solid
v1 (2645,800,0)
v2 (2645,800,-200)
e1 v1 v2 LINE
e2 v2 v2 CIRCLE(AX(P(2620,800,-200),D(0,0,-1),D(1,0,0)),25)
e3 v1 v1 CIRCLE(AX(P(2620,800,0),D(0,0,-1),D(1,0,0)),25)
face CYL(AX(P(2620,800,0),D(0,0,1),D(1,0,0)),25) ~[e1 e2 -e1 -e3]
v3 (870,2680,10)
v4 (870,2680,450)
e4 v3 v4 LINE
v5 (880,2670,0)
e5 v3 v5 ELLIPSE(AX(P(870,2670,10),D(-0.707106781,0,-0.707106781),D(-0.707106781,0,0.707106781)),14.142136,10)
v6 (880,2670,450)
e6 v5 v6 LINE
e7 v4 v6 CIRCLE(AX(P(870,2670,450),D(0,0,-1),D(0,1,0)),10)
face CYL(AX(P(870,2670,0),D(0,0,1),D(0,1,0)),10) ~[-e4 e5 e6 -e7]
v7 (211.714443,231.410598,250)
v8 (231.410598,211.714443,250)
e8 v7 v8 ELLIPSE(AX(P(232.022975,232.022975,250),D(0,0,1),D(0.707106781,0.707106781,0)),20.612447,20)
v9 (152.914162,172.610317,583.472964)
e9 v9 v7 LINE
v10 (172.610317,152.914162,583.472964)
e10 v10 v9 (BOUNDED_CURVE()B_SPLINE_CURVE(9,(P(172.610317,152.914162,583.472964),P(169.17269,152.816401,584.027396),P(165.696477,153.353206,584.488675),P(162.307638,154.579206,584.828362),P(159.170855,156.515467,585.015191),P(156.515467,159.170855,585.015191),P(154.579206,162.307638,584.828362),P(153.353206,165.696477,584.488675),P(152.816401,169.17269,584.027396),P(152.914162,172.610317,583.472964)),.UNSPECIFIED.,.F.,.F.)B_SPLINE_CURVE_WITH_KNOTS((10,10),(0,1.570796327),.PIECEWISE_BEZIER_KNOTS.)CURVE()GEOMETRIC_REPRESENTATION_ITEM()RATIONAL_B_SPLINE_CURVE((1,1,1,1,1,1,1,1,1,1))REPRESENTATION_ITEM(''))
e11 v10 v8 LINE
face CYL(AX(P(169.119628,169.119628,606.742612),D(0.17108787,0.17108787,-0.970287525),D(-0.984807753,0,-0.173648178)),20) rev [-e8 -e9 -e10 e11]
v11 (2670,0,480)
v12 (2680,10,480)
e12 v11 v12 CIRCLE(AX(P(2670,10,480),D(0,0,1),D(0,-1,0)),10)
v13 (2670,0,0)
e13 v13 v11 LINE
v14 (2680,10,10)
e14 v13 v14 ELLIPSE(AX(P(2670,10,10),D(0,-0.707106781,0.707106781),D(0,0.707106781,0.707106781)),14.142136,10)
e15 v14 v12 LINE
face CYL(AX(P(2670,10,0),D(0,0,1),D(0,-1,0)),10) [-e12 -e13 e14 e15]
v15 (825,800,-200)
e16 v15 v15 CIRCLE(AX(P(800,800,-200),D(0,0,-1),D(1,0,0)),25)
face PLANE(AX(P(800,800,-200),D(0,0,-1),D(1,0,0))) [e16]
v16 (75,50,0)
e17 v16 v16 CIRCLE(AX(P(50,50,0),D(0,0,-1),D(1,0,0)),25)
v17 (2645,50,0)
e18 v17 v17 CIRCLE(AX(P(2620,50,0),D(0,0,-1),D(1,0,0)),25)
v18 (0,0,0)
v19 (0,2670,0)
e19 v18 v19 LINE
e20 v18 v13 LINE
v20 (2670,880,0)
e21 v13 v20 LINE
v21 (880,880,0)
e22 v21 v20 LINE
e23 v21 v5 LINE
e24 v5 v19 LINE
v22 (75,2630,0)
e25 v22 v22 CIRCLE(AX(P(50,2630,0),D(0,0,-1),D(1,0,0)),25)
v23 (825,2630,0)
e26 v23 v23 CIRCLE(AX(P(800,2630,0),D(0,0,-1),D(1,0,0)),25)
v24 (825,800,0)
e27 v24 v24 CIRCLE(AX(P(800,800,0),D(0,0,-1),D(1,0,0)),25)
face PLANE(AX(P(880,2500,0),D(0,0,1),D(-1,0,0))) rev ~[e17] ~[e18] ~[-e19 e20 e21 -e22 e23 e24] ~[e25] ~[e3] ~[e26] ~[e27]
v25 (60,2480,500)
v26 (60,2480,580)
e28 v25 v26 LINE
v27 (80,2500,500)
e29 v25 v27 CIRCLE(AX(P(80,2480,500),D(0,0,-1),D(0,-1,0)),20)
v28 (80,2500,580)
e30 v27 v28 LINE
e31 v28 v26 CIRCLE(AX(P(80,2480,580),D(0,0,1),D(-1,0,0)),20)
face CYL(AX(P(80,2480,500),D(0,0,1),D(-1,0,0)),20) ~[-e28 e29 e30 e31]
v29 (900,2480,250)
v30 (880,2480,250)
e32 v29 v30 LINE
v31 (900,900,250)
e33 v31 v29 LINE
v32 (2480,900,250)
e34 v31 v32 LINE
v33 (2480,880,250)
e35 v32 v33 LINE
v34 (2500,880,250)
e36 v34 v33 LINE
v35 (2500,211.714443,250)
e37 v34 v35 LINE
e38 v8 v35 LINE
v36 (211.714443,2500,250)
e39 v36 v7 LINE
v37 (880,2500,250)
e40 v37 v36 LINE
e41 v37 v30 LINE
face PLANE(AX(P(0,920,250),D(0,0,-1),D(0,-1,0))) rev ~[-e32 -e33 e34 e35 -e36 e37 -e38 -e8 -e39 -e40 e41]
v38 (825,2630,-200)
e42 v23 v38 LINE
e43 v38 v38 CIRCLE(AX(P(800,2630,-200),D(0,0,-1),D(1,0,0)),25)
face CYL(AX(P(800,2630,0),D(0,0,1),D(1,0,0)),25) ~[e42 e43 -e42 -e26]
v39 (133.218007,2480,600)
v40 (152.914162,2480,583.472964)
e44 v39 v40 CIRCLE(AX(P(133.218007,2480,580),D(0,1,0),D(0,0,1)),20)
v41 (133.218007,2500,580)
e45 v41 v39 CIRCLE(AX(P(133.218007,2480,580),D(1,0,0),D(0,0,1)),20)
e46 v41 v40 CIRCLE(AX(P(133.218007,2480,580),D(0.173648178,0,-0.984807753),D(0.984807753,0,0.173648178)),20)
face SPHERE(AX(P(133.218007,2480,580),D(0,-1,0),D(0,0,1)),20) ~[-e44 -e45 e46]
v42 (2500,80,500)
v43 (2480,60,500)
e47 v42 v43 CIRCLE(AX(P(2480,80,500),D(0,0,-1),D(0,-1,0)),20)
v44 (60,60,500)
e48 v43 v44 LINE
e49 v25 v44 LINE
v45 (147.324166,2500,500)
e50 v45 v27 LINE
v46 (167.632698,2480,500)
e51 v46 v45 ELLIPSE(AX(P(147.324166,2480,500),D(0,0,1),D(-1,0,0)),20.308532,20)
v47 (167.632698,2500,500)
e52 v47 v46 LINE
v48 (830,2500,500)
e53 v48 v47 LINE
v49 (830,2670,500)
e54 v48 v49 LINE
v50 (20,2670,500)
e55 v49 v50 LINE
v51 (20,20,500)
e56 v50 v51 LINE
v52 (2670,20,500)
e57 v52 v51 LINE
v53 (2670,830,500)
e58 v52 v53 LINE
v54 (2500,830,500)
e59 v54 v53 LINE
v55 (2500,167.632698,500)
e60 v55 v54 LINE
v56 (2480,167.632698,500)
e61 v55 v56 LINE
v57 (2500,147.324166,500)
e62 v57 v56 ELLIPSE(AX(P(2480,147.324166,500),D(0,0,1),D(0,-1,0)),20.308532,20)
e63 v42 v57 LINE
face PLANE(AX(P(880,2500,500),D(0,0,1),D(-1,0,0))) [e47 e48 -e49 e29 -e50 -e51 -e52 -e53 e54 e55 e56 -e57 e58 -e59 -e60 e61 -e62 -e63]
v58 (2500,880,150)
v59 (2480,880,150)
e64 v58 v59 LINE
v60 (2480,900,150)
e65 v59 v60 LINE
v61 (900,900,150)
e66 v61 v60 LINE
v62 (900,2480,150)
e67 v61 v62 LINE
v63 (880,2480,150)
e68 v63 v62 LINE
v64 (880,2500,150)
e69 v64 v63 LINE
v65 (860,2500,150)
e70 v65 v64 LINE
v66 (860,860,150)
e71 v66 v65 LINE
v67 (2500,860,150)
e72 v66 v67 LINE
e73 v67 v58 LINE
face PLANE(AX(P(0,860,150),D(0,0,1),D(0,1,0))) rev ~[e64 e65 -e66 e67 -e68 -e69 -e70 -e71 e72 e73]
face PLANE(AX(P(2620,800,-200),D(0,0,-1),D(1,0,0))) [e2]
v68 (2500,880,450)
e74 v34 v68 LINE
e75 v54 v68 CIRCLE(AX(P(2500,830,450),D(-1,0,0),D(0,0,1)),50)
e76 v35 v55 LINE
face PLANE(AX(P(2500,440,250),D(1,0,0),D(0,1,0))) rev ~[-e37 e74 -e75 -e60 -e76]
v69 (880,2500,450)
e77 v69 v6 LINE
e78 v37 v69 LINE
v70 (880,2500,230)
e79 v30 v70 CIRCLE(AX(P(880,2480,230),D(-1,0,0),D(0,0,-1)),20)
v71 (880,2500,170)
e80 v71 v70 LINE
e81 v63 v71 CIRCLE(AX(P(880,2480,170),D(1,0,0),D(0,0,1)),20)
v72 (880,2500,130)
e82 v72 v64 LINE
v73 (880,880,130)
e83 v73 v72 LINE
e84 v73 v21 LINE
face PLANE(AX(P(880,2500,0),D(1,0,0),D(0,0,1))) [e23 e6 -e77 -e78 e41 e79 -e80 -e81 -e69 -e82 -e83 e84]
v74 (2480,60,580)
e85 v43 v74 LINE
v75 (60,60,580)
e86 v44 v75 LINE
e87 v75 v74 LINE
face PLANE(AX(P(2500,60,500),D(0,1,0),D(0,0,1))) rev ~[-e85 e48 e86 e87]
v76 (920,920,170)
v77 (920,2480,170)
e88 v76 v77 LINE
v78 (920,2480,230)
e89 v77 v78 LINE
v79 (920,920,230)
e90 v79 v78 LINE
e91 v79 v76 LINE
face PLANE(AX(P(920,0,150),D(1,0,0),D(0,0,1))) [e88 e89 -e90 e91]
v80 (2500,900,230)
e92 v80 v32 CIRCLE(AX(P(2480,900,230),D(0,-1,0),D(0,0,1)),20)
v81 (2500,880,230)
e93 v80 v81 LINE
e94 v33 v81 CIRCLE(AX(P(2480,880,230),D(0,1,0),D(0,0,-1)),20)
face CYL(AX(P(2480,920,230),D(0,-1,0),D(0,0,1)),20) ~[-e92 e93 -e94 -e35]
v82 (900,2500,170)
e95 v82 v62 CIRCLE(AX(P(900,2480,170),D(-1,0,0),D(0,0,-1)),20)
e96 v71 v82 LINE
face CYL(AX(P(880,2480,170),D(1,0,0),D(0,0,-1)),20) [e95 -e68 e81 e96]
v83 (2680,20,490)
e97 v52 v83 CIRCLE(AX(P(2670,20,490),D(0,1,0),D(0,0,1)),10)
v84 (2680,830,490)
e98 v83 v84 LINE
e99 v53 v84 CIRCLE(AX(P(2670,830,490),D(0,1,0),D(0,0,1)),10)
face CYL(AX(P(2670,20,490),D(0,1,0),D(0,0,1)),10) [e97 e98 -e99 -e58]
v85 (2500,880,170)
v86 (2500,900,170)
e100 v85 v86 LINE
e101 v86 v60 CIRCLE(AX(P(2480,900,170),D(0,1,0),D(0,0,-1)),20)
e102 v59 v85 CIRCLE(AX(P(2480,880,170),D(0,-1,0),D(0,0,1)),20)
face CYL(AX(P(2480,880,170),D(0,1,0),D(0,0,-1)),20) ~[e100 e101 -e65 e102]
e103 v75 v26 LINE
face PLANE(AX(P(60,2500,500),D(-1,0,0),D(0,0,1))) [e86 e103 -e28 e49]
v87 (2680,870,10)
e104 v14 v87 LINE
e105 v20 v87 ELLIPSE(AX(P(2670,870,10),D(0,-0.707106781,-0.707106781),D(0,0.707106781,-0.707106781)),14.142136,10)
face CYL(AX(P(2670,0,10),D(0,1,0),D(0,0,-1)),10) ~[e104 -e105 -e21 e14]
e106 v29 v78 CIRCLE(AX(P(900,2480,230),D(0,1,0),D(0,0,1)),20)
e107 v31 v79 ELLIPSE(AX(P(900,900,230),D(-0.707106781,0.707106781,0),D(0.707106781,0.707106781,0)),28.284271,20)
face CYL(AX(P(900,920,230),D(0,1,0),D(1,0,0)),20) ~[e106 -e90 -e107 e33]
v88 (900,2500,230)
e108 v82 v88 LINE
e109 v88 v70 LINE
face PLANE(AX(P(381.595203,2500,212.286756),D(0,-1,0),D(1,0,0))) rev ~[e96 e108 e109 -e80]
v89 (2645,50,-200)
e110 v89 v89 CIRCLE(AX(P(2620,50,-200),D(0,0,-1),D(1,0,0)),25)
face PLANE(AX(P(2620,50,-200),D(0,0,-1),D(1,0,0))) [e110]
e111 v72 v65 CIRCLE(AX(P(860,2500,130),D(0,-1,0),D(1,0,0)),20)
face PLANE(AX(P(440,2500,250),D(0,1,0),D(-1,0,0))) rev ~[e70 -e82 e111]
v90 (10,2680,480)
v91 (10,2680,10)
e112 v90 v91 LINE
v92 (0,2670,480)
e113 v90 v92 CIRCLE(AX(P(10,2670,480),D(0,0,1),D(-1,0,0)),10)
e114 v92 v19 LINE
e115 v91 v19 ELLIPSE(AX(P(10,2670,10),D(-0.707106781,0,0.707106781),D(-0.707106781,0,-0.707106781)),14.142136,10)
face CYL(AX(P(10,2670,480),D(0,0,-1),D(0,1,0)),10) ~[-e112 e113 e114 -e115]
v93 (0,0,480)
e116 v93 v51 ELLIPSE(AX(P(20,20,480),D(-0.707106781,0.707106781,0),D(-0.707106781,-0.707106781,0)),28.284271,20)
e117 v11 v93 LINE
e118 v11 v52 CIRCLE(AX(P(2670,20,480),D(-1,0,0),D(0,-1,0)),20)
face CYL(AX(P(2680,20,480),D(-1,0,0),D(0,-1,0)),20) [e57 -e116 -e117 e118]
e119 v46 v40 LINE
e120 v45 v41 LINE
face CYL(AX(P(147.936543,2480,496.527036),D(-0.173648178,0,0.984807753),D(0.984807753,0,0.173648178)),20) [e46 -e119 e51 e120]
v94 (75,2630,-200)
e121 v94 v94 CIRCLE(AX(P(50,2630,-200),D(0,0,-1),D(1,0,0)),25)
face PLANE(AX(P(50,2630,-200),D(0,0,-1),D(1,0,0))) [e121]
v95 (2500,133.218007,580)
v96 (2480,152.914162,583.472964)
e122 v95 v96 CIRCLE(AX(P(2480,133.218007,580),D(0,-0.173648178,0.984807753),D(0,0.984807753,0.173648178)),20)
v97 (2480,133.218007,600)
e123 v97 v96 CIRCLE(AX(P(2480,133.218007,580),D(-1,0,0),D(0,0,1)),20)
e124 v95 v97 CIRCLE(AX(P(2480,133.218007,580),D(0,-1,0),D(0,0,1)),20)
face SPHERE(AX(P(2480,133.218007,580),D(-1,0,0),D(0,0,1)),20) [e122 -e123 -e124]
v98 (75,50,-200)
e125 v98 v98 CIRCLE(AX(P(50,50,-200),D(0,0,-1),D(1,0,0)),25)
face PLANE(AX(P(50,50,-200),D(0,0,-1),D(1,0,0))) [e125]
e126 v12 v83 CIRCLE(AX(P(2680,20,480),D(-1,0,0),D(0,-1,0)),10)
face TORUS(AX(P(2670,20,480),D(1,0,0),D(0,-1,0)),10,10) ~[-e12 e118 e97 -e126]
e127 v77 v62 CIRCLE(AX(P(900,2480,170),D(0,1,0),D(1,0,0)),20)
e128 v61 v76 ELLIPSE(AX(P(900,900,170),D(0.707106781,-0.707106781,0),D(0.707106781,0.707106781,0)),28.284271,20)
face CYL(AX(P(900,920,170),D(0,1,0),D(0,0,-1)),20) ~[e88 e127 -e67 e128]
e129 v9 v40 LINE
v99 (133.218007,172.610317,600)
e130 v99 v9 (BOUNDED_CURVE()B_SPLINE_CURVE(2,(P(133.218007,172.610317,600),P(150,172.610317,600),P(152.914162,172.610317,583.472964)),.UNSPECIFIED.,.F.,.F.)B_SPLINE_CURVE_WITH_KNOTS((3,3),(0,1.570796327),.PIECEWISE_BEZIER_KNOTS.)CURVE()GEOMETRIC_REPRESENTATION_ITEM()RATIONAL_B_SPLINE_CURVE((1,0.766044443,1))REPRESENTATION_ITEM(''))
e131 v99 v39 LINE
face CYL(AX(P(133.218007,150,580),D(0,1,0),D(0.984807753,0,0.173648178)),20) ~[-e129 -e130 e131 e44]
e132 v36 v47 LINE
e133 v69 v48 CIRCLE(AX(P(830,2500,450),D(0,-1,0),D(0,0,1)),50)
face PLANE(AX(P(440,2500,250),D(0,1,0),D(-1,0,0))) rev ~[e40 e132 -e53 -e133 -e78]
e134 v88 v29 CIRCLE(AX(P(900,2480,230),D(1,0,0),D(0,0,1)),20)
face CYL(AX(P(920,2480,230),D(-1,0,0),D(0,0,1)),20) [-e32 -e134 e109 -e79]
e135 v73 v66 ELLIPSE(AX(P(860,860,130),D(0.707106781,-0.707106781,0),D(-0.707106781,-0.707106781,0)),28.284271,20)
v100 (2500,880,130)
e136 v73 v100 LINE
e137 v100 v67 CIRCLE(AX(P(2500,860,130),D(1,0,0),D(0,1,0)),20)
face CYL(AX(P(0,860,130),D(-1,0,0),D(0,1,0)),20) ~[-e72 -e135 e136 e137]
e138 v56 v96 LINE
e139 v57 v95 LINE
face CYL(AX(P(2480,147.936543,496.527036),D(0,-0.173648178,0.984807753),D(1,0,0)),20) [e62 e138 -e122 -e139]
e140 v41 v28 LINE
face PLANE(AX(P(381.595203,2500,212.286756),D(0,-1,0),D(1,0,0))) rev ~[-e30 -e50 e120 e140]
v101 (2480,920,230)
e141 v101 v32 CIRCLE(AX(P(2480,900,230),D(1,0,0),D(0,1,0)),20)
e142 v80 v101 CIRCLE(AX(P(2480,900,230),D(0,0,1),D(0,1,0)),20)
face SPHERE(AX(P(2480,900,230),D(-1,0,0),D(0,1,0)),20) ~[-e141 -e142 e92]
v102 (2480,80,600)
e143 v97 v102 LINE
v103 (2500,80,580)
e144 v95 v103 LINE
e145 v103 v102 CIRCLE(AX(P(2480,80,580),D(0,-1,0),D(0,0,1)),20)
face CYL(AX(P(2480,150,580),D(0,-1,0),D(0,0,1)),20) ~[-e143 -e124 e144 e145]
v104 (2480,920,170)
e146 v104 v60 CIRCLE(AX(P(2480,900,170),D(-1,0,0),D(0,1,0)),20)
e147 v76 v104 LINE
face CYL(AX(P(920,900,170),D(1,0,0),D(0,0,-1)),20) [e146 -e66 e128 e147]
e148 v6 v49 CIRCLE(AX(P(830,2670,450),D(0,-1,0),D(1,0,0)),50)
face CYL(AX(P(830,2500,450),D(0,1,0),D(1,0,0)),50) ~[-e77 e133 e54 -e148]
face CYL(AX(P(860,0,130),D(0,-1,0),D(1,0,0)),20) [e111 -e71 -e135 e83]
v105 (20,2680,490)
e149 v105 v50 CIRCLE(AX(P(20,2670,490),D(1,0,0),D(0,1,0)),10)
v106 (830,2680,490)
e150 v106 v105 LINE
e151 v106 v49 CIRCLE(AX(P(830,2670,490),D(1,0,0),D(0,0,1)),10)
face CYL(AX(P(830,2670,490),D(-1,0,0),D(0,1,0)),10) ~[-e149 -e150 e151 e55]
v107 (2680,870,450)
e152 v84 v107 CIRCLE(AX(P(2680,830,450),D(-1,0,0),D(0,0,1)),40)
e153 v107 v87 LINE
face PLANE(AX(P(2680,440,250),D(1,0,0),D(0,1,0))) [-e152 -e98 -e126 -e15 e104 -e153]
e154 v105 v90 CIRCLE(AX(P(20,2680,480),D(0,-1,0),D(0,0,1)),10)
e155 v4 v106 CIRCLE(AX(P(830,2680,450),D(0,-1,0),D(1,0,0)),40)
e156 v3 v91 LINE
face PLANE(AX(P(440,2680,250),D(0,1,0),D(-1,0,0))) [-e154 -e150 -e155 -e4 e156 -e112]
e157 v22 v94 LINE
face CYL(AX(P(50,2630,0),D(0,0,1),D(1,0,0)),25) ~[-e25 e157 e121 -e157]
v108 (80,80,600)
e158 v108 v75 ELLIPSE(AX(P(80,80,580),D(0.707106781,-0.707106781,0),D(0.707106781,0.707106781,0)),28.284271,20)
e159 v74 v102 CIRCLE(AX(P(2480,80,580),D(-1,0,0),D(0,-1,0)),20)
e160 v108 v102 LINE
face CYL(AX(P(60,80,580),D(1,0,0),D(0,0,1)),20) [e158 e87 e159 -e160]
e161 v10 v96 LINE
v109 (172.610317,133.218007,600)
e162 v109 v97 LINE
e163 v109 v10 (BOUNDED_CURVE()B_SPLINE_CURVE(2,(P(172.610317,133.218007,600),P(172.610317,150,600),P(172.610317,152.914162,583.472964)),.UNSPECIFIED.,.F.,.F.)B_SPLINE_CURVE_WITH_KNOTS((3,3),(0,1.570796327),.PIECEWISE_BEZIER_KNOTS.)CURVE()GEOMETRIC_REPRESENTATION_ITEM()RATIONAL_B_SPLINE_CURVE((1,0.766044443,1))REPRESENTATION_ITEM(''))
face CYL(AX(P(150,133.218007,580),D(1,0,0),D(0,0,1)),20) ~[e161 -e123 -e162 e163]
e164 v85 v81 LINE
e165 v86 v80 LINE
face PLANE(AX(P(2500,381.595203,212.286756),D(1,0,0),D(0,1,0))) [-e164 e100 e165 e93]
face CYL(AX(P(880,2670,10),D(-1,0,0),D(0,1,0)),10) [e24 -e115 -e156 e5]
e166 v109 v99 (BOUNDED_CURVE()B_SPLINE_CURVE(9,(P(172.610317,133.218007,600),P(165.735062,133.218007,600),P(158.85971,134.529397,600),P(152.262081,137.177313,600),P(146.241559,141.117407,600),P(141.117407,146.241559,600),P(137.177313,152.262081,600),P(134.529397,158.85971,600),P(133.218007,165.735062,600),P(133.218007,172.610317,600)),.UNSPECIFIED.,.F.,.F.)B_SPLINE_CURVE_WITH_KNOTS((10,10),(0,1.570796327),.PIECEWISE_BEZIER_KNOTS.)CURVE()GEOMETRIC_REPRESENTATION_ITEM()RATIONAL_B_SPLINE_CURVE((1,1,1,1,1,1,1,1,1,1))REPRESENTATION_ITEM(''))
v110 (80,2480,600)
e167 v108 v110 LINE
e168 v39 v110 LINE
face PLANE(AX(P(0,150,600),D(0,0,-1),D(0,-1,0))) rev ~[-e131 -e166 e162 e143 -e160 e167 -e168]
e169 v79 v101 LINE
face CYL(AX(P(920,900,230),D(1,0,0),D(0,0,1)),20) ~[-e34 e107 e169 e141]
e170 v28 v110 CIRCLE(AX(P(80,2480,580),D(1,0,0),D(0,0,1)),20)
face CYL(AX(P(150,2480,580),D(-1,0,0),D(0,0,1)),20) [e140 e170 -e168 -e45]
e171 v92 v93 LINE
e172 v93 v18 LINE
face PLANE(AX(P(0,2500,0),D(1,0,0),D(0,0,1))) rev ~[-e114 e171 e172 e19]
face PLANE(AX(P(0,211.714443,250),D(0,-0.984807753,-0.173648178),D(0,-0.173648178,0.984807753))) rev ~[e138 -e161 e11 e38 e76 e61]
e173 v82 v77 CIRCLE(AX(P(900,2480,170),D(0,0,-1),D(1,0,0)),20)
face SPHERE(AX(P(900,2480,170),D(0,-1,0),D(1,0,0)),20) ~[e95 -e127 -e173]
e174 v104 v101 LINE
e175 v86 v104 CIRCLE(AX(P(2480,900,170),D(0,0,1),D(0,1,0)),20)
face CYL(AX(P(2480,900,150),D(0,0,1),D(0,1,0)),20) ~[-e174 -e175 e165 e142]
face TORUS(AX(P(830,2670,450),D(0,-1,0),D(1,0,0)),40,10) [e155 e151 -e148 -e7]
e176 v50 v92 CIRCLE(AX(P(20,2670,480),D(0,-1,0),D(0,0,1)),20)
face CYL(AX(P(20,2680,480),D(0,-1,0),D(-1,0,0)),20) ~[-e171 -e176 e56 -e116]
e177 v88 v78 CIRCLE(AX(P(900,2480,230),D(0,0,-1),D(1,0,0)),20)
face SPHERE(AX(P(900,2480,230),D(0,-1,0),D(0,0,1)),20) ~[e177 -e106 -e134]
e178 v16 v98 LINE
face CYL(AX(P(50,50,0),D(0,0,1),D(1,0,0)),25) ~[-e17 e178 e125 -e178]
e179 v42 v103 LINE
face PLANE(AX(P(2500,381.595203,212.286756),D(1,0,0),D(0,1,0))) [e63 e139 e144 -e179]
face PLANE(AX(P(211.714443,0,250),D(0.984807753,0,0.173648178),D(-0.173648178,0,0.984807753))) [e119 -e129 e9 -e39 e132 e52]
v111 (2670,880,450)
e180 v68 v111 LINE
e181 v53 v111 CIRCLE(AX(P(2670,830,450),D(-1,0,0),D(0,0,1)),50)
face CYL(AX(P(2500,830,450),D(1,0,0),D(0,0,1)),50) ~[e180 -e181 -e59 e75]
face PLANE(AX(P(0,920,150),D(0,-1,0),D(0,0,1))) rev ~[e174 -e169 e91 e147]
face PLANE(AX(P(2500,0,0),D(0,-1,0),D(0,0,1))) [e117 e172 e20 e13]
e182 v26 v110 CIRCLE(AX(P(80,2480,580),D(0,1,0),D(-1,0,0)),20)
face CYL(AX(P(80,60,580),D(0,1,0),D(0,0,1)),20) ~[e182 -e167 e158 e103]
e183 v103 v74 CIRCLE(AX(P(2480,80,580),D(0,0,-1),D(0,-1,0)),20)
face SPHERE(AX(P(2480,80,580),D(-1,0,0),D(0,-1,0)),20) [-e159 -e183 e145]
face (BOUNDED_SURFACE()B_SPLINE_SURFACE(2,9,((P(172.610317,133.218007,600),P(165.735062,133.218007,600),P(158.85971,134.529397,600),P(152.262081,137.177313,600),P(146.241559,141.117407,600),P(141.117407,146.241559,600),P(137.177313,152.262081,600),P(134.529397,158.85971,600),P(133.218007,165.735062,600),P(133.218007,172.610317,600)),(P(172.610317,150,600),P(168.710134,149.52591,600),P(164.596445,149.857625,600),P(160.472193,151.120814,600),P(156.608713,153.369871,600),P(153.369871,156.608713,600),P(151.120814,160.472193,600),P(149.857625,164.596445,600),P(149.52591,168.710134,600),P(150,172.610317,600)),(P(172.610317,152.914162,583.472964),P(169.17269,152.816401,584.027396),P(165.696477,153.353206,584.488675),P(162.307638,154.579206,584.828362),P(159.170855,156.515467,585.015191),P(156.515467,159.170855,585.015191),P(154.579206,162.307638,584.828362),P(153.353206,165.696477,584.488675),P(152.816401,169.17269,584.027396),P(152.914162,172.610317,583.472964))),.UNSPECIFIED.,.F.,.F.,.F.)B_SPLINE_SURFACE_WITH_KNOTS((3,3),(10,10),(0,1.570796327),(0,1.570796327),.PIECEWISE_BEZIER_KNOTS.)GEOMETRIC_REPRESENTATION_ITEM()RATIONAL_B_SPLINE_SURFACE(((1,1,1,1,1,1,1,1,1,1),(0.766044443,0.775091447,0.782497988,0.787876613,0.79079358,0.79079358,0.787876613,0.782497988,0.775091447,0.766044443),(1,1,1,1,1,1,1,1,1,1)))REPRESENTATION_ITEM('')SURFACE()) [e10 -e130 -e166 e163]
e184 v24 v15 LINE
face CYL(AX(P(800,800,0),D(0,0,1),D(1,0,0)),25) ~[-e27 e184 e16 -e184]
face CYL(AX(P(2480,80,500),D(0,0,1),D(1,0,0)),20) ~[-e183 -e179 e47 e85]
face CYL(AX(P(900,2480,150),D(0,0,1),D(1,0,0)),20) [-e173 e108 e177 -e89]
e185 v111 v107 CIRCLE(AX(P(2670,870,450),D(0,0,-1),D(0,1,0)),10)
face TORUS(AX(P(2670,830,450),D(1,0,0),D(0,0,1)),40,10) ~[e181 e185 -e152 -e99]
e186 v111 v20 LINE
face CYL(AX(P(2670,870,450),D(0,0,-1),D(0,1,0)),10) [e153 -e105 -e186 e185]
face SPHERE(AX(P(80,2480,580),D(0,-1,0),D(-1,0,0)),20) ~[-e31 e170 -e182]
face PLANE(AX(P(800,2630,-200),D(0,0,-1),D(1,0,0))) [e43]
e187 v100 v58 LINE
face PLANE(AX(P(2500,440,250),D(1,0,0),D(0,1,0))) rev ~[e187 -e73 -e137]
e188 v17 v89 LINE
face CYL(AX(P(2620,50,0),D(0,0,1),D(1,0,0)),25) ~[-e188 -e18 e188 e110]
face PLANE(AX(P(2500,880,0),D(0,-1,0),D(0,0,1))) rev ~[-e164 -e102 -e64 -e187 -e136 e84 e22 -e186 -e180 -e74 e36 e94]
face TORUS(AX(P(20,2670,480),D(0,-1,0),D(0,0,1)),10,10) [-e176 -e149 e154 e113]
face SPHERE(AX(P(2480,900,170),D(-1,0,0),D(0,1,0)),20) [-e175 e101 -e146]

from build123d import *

# Parameters (mm, degrees)
F1_DEPTH  = 2500
F3_DEPTH  = 2500
F4_W      = 160
F4_H      = 150
F5_DEPTH  = 2500.001
F6_W      = 150
F6_H      = 150
F7_DEPTH  = 2500.001
F8_W      = 880
F8_H      = 500
F9_DEPTH  = 180
F10_W     = 880
F10_H     = 500
F11_DEPTH = 180
F12_R     = 20
F13_R     = 50
F14_R     = 10
F15_R     = 25
F16_DEPTH = 200


with BuildPart() as f1:
    # F0 (on Front) → F1 (new body)
    with BuildSketch(Plane.XZ):
        with BuildLine():
            Line((0, 600), (0, 0))
            Line((0, 0), (880, 0))
            Line((880, 0), (880, 130))
            ThreePointArc((880, 130), (874.1421356237, 144.1421356237), (860, 150))
            Line((860, 150), (920, 150))
            Line((920, 150), (920, 250))
            Line((920, 250), (211.714443248, 250))
            Line((211.714443248, 250), (150, 600))
            Line((150, 600), (0, 600))
        make_face()
    extrude(amount=-F1_DEPTH)

    # F2 (on Right) → F3 (join)
    with BuildSketch(Plane.YZ):
        with BuildLine():
            Line((0, 600), (0, 0))
            Line((0, 0), (880, 0))
            Line((880, 0), (880, 130))
            ThreePointArc((880, 130), (874.1421356237, 144.1421356237), (860, 150))
            Line((860, 150), (920, 150))
            Line((920, 150), (920, 250))
            Line((920, 250), (211.714443248, 250))
            Line((211.714443248, 250), (150, 600))
            Line((150, 600), (0, 600))
        make_face()
    extrude(amount=F3_DEPTH)

    # F4 (on face) → F5 (cut, through all)
    with BuildSketch(Plane.YZ.offset(2500)):
        with Locations((-20, 575)):
            Rectangle(F4_W, F4_H)
    extrude(amount=-F5_DEPTH, mode=Mode.SUBTRACT)

    # F6 (on face) → F7 (cut, through all)
    with BuildSketch(Plane(origin=(0, 2500, 0), x_dir=(-1, 0, 0), z_dir=(0, 1, 0))):
        with Locations((15, 575)):
            Rectangle(F6_W, F6_H)
    extrude(amount=-F7_DEPTH, mode=Mode.SUBTRACT)

    # F8 (on face) → F9 (join)
    with BuildSketch(Plane.YZ.offset(2500)):
        with Locations((440, 250)):
            Rectangle(F8_W, F8_H)
    extrude(amount=F9_DEPTH)

    # F10 (on face) → F11 (join)
    with BuildSketch(Plane(origin=(0, 2500, 0), x_dir=(-1, 0, 0), z_dir=(0, 1, 0))):
        with Locations((-440, 250)):
            Rectangle(F10_W, F10_H)
    extrude(amount=F11_DEPTH)

    # F12
    f12_edges = [f1.edges().sort_by_distance(p)[0] for p in [
        (1325, 150, 600),
        (1280, 60, 600),
        (1710, 920, 250),
        (920, 1710, 250),
        (1710, 920, 150),
        (920, 1710, 150),
        (150, 1325, 600),
        (60, 1280, 600),
        (1340, 0, 500),
        (0, 1340, 500),
        (2500, 920, 200),
        (2500, 900, 250),
        (2500, 900, 150),
        (900, 2500, 250),
        (920, 2500, 200),
        (900, 2500, 150),
        (60, 2500, 550),
        (105, 2500, 600),
        (158.816349, 2500, 550),
        (2500, 60, 550),
        (2500, 105, 600),
        (2500, 158.816349, 550),
        (180.857222, 180.857222, 425),
    ]]
    fillet(f12_edges, radius=F12_R)

    # F13
    f13_edges = [f1.edges().sort_by_distance(p)[0] for p in [
        (2590, 880, 500),
        (880, 2590, 500),
    ]]
    fillet(f13_edges, radius=F13_R)

    # F14
    f14_edges = [f1.edges().sort_by_distance(p)[0] for p in [
        (2680, 425, 500),
        (2680, 865.355339, 485.355339),
        (2680, 5.857864, 494.142136),
        (2680, 880, 225),
        (2680, 0, 240),
        (2680, 440, 0),
        (425, 2680, 500),
        (865.355339, 2680, 485.355339),
        (5.857864, 2680, 494.142136),
        (880, 2680, 225),
        (0, 2680, 240),
        (440, 2680, 0),
    ]]
    fillet(f14_edges, radius=F14_R)

    # F15 (on face) → F16 (join)
    with BuildSketch(Plane(origin=(0, 0, 0), x_dir=(1, 0, 0), z_dir=(0, 0, -1))):
        with Locations((50, -2630)):
            Circle(F15_R)
        with Locations((50, -50)):
            Circle(F15_R)
        with Locations((800, -2630)):
            Circle(F15_R)
        with Locations((2620, -50)):
            Circle(F15_R)
        with Locations((2620, -800)):
            Circle(F15_R)
        with Locations((800, -800)):
            Circle(F15_R)
    extrude(amount=F16_DEPTH)


solid = f1.part
